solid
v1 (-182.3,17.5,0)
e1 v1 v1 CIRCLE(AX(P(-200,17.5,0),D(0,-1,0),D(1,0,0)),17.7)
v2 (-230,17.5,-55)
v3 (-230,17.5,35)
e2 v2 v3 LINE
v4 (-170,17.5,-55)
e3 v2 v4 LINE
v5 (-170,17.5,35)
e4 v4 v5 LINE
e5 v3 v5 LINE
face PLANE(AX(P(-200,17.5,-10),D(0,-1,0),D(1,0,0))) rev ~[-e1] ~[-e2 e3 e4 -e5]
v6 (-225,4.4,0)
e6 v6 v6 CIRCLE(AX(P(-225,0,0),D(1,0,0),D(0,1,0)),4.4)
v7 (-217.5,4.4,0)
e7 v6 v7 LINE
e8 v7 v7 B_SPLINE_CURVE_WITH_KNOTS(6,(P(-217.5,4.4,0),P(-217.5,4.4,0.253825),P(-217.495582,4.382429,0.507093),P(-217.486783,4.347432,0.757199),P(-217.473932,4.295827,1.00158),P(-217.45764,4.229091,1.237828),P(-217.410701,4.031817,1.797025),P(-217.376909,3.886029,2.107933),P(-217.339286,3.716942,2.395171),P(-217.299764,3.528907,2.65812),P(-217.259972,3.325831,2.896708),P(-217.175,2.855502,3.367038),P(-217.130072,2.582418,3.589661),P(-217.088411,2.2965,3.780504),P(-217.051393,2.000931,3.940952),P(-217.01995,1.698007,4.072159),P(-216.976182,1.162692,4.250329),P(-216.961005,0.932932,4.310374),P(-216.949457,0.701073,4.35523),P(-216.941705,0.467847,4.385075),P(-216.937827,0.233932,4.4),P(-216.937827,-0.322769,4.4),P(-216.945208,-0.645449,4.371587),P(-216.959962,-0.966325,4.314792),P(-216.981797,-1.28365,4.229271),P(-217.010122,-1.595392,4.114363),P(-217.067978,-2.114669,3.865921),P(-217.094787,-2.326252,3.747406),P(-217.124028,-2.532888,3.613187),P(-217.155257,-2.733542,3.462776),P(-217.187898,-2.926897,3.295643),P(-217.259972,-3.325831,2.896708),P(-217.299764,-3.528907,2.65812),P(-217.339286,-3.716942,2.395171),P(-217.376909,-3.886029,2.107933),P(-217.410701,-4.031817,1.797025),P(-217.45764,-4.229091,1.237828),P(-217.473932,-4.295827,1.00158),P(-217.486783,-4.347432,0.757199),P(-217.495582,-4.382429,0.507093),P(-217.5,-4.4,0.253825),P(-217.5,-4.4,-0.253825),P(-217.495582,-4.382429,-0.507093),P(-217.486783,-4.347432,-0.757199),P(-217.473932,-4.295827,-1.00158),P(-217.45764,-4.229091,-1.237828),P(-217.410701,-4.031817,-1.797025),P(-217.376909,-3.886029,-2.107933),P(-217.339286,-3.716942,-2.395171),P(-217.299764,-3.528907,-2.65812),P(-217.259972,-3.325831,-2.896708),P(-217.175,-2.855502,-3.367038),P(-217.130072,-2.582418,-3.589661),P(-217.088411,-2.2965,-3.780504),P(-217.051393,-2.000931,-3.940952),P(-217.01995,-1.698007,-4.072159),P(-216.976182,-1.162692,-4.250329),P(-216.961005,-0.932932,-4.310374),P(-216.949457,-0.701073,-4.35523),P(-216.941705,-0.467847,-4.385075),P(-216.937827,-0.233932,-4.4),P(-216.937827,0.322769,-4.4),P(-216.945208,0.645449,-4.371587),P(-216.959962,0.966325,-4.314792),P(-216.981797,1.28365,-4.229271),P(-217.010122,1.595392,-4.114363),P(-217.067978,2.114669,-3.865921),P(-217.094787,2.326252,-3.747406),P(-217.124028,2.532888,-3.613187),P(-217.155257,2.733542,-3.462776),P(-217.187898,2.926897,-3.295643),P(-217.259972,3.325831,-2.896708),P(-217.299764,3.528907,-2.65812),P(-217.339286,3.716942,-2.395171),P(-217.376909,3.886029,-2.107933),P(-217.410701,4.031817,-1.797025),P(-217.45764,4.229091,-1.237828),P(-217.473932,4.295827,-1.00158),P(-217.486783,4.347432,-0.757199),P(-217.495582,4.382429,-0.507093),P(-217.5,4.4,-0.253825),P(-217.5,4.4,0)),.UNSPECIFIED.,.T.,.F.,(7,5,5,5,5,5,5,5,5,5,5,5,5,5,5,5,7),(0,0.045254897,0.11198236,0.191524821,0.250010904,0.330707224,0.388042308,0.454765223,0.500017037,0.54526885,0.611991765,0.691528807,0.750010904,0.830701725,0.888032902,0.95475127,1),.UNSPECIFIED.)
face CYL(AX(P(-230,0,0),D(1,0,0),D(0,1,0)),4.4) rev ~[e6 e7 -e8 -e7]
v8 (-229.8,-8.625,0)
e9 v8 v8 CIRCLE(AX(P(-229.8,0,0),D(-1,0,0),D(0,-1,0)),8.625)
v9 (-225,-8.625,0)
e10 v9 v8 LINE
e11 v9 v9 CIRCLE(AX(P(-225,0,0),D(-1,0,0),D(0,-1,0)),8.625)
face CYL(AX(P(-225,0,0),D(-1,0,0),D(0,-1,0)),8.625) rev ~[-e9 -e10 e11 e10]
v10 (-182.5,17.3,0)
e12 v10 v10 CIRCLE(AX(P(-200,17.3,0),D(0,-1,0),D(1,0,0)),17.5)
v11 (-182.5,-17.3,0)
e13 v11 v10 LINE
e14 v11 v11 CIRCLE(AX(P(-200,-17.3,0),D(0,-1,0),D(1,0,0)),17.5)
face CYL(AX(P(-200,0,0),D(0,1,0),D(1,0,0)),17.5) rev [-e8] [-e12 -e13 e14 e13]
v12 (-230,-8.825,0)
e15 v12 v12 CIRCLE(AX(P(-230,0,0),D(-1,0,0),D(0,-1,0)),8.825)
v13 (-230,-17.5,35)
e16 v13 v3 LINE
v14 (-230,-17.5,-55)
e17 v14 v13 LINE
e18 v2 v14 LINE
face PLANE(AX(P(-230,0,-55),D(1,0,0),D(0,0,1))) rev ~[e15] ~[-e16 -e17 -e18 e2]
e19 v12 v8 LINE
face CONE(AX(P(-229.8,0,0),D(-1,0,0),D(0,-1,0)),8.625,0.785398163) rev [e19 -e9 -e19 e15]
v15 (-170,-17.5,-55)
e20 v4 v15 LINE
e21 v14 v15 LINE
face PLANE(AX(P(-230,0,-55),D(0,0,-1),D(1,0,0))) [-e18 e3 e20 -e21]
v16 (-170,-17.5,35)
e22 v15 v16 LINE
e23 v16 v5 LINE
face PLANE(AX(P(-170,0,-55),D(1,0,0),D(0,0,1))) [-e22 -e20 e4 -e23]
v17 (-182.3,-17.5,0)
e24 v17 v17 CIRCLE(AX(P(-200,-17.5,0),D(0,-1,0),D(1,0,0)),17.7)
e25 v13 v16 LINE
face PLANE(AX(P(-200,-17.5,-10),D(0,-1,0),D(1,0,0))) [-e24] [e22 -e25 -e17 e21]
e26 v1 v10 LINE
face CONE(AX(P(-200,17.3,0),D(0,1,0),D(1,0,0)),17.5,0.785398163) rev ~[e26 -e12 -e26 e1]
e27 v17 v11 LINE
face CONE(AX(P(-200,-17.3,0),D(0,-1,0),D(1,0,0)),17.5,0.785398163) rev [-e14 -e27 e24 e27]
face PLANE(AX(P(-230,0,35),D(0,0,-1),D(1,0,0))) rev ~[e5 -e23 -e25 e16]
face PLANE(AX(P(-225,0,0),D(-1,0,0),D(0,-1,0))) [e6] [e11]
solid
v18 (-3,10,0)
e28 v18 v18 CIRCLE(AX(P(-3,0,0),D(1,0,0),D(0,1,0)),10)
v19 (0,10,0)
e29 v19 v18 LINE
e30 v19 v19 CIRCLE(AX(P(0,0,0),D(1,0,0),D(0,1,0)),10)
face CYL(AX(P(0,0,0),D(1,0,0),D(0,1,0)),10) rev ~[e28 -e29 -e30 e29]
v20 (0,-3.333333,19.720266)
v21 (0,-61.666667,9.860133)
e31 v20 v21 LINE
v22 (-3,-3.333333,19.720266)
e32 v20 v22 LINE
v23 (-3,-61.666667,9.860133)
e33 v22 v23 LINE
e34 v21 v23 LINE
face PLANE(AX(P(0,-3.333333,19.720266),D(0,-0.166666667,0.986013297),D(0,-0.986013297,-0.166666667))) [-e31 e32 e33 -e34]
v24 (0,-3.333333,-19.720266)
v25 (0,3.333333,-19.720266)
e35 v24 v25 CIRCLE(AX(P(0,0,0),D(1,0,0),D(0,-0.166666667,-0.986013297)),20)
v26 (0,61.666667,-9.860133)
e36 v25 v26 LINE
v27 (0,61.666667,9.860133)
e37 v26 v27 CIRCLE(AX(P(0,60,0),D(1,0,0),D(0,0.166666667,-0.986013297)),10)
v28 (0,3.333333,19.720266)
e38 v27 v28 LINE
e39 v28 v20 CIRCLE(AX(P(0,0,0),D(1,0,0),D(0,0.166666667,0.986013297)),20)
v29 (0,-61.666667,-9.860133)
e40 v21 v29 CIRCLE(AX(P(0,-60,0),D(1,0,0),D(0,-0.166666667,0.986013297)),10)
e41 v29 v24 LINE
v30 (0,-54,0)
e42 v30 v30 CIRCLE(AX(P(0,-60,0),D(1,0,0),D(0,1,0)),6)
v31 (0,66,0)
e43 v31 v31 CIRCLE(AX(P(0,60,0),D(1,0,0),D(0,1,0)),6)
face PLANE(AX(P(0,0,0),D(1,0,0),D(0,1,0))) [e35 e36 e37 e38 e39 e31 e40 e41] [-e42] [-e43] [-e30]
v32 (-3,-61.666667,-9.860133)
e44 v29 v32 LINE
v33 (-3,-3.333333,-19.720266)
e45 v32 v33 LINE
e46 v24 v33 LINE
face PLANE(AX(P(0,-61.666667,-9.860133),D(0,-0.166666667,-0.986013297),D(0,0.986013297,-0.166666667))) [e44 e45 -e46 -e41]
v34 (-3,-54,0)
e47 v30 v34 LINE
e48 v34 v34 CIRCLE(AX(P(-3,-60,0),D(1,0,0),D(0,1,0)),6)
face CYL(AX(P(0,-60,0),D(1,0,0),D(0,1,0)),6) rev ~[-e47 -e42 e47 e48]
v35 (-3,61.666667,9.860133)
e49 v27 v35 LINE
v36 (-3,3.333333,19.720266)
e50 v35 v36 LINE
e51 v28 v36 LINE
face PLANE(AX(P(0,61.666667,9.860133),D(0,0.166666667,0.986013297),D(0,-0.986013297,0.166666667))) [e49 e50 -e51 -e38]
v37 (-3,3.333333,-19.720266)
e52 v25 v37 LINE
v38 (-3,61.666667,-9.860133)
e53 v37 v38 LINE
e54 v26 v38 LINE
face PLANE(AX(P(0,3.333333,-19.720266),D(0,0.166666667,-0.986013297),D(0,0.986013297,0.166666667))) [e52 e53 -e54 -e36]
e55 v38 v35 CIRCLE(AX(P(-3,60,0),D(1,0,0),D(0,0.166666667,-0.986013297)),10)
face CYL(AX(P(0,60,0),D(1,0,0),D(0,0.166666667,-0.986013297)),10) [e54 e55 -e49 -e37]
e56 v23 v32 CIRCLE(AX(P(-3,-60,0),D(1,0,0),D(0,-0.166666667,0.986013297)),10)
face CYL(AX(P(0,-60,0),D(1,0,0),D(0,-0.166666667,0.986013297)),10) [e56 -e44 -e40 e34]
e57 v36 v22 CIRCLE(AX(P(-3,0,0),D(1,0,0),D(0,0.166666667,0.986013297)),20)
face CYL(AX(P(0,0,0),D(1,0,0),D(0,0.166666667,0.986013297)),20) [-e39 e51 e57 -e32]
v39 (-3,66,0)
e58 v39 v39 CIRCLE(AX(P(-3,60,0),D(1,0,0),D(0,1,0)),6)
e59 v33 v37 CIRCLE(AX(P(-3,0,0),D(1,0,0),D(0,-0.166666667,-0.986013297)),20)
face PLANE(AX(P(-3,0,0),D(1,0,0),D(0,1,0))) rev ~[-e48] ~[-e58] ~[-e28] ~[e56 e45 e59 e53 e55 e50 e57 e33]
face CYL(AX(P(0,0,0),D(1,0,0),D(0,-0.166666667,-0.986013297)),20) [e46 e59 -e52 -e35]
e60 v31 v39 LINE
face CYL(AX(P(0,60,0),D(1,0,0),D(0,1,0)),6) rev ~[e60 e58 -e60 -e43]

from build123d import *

# Parameters (mm, degrees)
F0_W           = 60
F0_H           = 90
F0_R           = 17.5
F1_DEPTH       = 17.5
F3_D           = 8.8
F3_DEPTH       = 15
F3_CBORE_D     = 17.25
F3_CBORE_DEPTH = 5
F3_TIP         = 2.6437867237
F4_SIZE        = 0.2
F5_R           = 6
F5_R_2         = 10
F6_DEPTH       = 3


with BuildPart() as f1:
    # F0 (on Front) → F1 (new body, symmetric)
    with BuildSketch(Plane.XZ):
        with Locations((-200, -10)):
            Rectangle(F0_W, F0_H)
        with Locations((-200, 0)):
            Circle(F0_R, mode=Mode.SUBTRACT)
    extrude(amount=F1_DEPTH, both=True)

    # F3
    with Locations(Plane(origin=(-230, 0, 0), x_dir=(0, -1, 0), z_dir=(-1, 0, 0))):
        with Locations((0, 0)):
            CounterBoreHole(F3_D / 2, F3_CBORE_D / 2, F3_CBORE_DEPTH, depth=F3_DEPTH)
            with Locations((0, 0, -(F3_DEPTH + F3_TIP / 2))):  # 118° drill point
                Cone(0, F3_D / 2, F3_TIP, mode=Mode.SUBTRACT)

    # F4
    f4_edges = [f1.edges().sort_by_distance(p)[0] for p in [
        (-217.5, -17.5, 0),
        (-217.5, 17.5, 0),
        (-230, 8.625, 0),
    ]]
    chamfer(f4_edges, length=F4_SIZE)


with BuildPart() as f6:
    # F5 (on Right) → F6 (new body)
    with BuildSketch(Plane.YZ):
        with BuildLine():
            Line((61.6666666667, 9.8601329718), (3.3333333333, 19.7202659437))
            ThreePointArc((3.3333333333, 19.7202659437), (0, 20), (-3.3333333333, 19.7202659437))
            Line((-3.3333333333, 19.7202659437), (-61.6666666667, 9.8601329718))
            ThreePointArc((-61.6666666667, 9.8601329718), (-70, 0), (-61.6666666667, -9.8601329718))
            Line((-61.6666666667, -9.8601329718), (-3.3333333333, -19.7202659437))
            ThreePointArc((-3.3333333333, -19.7202659437), (0, -20), (3.3333333333, -19.7202659437))
            Line((3.3333333333, -19.7202659437), (61.6666666667, -9.8601329718))
            ThreePointArc((61.6666666667, -9.8601329718), (70, 0), (61.6666666667, 9.8601329718))
        make_face()
        with Locations((-60, 0)):
            Circle(F5_R, mode=Mode.SUBTRACT)
        Circle(F5_R_2, mode=Mode.SUBTRACT)
        with Locations((60, 0)):
            Circle(F5_R, mode=Mode.SUBTRACT)
    extrude(amount=-F6_DEPTH)


solid = Compound([f1.part, f6.part])
